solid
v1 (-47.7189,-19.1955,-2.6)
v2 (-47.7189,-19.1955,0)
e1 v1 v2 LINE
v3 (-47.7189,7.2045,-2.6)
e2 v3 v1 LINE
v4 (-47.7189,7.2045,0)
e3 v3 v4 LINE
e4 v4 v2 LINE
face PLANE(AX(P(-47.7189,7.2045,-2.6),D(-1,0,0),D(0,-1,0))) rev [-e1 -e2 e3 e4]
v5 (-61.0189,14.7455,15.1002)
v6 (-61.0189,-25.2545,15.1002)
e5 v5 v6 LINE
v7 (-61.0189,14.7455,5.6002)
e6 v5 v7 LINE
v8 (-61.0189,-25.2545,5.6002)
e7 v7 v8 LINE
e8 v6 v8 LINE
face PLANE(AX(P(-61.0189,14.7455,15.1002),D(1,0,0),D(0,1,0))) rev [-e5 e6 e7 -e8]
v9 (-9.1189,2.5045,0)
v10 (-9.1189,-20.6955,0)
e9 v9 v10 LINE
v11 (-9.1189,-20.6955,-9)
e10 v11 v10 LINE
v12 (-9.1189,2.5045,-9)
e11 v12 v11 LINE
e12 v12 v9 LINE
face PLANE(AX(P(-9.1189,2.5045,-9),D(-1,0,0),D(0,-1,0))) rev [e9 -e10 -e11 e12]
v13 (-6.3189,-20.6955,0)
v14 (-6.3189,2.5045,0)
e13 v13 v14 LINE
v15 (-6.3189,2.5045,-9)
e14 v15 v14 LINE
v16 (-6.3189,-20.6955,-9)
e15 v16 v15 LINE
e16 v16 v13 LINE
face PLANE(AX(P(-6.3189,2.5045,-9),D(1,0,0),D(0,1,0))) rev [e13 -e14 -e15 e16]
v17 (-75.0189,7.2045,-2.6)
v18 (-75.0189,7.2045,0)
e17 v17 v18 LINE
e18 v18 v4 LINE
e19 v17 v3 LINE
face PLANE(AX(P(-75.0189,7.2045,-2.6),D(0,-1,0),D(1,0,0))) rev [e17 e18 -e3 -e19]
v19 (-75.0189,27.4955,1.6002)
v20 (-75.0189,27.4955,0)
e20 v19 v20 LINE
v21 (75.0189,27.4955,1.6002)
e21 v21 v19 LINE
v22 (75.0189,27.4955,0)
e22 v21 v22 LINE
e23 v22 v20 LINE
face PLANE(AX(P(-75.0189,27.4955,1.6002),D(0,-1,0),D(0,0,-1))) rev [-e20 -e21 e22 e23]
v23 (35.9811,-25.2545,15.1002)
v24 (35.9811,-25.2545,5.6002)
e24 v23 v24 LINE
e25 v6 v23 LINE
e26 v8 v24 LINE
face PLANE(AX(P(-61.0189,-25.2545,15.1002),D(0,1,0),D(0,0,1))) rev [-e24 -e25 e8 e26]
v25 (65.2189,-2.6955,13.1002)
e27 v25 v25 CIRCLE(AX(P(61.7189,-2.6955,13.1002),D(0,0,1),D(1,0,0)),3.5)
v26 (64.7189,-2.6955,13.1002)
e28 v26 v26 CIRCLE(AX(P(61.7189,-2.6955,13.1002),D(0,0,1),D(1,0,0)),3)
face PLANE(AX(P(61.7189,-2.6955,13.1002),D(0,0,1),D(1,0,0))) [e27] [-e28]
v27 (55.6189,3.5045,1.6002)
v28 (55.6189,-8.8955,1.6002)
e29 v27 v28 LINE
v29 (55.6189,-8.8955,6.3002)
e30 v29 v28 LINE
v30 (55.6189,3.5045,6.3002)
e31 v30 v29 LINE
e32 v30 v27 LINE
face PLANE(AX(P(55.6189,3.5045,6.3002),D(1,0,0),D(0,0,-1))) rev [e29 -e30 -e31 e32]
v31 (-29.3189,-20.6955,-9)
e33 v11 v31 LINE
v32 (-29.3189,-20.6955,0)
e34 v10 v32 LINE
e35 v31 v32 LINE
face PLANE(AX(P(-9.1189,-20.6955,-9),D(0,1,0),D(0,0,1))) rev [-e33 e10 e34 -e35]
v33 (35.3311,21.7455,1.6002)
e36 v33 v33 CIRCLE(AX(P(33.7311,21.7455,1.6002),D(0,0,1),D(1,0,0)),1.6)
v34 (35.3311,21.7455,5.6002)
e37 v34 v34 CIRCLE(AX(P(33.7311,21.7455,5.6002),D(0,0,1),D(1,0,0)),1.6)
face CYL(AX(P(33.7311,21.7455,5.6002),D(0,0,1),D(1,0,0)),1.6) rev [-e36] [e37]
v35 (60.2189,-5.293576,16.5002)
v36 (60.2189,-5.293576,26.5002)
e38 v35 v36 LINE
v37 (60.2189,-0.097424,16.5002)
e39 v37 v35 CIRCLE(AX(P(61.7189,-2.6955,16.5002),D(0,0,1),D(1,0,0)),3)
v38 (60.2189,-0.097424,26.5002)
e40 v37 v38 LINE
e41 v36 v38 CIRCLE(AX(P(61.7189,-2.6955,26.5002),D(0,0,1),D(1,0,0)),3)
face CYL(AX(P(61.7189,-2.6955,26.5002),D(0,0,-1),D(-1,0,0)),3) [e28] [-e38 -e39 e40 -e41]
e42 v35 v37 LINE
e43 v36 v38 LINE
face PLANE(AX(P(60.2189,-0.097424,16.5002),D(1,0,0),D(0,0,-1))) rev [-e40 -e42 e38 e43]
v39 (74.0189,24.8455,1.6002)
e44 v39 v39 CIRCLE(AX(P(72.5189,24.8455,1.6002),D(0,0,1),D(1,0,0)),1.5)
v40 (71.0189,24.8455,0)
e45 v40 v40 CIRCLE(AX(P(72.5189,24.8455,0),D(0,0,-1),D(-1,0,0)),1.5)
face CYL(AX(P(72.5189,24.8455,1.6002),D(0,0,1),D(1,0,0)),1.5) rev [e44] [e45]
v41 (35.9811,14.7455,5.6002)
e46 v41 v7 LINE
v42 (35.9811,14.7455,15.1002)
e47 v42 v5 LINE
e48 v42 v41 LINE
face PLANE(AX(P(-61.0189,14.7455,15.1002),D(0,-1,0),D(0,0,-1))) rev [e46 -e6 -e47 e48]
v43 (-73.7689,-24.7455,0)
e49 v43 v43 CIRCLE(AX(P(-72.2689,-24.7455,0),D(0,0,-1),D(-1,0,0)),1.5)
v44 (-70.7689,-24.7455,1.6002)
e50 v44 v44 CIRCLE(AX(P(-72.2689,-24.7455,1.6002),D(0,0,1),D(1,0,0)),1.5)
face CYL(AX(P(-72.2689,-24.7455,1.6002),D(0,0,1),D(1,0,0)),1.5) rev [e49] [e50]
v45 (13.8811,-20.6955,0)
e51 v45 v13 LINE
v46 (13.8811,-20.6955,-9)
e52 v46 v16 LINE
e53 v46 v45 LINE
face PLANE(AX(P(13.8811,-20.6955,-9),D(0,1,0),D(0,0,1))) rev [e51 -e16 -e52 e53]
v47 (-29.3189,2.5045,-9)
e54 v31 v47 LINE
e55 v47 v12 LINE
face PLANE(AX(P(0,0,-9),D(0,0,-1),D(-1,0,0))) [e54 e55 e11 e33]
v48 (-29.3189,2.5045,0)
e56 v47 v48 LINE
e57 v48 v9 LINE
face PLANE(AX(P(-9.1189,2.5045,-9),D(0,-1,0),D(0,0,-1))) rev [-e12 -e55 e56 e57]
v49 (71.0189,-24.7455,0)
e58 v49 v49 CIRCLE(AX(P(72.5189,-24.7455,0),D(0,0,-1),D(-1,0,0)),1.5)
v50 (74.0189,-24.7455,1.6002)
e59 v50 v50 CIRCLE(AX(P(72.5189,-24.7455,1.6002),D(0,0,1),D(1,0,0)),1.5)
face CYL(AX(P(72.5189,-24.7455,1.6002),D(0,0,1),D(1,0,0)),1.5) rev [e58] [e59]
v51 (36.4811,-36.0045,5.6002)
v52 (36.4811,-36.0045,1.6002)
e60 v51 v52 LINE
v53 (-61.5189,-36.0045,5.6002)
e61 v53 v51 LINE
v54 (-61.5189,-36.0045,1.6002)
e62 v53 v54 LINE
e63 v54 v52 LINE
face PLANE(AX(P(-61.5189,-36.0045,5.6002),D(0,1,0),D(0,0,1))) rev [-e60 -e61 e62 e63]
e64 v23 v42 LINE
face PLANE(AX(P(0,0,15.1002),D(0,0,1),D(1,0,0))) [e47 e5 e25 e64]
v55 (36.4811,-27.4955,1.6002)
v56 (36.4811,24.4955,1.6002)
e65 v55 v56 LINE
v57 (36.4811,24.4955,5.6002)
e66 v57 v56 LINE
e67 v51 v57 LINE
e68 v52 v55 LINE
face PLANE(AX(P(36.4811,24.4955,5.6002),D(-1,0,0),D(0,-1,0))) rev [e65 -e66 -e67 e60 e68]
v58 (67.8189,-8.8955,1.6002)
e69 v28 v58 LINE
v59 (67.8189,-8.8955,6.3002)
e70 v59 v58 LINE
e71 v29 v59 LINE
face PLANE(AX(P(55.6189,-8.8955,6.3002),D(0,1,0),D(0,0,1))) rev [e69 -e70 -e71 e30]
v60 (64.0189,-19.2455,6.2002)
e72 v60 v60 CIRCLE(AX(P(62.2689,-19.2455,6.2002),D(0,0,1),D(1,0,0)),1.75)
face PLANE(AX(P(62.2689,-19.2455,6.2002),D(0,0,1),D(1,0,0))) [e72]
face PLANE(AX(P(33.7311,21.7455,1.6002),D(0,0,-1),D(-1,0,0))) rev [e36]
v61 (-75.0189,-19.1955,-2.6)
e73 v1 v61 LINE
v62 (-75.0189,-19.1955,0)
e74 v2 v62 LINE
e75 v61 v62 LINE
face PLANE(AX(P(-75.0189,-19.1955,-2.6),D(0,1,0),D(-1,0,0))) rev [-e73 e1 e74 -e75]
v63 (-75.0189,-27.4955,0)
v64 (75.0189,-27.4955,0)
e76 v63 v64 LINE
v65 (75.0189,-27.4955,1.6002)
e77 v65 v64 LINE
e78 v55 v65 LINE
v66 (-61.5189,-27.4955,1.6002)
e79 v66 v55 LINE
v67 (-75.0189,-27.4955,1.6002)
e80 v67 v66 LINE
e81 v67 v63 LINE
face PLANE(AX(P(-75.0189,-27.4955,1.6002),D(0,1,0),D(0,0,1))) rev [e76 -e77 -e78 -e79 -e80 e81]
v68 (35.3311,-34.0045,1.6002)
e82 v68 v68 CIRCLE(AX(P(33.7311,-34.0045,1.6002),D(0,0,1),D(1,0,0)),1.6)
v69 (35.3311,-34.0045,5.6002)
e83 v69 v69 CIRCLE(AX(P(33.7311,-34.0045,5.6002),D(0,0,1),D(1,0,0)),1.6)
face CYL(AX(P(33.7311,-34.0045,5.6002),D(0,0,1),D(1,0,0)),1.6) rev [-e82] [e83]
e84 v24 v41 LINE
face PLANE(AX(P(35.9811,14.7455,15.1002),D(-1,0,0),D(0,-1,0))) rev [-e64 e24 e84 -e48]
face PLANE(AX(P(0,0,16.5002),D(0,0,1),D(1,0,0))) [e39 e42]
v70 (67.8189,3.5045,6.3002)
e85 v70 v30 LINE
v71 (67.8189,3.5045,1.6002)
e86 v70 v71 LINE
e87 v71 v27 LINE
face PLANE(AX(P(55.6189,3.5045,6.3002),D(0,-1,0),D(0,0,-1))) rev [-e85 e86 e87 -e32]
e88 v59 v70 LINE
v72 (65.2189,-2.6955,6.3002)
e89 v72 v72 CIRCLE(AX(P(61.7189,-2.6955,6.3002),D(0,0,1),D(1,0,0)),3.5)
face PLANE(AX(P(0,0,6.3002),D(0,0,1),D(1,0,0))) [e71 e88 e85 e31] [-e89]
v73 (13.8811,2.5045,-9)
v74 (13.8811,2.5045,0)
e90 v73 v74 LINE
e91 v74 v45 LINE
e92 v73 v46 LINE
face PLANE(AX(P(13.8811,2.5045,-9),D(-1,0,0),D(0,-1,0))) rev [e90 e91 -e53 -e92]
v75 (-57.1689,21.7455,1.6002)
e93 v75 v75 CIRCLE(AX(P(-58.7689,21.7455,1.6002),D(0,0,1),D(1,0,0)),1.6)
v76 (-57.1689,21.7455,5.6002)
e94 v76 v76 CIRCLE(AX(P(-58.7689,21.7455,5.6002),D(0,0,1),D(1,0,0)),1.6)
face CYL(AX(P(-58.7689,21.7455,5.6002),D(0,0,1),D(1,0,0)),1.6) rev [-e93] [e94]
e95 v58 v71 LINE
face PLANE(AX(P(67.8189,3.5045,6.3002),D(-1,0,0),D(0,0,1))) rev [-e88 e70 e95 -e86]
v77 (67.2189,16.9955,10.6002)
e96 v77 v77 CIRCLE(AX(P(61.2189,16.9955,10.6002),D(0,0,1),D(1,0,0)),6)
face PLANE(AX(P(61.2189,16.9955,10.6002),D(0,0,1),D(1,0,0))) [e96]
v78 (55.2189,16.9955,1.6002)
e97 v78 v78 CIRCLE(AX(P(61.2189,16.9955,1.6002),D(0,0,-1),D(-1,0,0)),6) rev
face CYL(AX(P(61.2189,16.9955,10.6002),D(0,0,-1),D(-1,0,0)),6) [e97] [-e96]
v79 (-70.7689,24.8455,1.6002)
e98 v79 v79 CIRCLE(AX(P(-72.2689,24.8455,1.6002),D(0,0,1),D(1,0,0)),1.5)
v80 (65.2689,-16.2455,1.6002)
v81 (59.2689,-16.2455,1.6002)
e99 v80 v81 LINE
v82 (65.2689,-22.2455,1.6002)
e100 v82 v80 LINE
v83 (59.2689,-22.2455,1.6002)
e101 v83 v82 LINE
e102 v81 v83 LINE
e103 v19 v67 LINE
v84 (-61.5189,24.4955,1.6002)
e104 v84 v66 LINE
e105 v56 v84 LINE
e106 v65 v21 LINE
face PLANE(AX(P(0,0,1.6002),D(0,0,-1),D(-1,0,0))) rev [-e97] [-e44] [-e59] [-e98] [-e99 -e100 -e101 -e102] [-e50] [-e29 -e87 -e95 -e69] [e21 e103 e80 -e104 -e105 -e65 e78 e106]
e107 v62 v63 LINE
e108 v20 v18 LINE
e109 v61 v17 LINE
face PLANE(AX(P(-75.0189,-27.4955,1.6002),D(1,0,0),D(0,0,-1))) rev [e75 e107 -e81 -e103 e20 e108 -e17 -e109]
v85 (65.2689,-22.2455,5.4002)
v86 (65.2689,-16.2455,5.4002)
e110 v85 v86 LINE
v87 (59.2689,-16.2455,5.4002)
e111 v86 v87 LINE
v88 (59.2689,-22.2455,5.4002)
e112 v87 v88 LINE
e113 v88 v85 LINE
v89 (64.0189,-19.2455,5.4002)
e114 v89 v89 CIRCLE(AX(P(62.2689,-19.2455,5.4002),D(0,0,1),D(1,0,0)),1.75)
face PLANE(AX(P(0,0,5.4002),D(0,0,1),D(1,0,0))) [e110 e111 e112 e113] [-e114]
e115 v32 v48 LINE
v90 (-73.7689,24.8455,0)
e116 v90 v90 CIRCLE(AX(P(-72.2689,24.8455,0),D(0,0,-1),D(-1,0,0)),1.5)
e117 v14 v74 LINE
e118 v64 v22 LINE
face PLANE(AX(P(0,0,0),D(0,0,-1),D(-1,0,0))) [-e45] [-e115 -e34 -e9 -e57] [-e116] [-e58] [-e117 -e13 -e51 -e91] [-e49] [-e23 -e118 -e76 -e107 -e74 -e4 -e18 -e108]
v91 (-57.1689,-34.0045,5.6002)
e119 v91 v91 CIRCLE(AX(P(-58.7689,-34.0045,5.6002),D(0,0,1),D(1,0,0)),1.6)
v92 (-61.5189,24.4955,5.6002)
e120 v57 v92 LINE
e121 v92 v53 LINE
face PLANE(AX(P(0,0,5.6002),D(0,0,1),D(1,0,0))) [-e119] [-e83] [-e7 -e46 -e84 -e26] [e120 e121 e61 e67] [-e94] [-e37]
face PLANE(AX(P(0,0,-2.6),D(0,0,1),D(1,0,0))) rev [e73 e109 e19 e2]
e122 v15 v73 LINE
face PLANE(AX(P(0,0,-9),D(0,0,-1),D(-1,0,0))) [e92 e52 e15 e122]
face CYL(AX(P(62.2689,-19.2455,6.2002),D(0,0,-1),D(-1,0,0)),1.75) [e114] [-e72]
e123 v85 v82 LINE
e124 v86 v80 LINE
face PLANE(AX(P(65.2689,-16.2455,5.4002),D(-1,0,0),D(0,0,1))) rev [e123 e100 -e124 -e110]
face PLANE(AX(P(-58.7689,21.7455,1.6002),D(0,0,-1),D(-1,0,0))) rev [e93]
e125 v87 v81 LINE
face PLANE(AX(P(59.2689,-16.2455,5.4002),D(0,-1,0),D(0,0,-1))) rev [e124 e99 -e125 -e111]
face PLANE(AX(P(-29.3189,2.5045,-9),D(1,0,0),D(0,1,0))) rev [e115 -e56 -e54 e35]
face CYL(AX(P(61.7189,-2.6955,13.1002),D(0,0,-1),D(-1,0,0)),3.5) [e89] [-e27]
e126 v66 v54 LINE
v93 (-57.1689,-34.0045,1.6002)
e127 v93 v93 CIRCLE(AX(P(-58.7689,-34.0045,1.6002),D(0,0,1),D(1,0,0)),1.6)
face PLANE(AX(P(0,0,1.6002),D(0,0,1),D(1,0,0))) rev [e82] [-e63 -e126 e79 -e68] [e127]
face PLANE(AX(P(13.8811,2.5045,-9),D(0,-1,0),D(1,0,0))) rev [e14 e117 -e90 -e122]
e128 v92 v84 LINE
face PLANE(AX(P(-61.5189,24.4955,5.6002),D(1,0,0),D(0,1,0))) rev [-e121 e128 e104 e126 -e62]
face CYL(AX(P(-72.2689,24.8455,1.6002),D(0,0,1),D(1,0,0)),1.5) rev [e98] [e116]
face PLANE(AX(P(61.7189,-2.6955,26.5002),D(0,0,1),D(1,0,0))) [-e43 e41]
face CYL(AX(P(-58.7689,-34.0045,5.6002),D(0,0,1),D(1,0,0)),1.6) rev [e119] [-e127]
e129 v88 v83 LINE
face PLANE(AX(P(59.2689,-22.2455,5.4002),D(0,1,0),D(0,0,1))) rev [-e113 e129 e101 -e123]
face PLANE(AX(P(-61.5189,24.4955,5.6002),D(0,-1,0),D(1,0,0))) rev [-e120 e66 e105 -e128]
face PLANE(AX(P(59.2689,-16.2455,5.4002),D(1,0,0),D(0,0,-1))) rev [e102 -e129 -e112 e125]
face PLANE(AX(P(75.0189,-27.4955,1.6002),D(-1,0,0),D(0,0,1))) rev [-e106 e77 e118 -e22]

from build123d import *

# Parameters (mm, degrees)
SKETCH1_W                          = 150.0378
SKETCH1_H                          = 54.991
BOSS_EXTRUDE1_DEPTH                = 1.6002
SKETCH2_W                          = 98
SKETCH2_H                          = 60.5
BOSS_EXTRUDE2_DEPTH                = 4
SKETCH3_W                          = 97
SKETCH3_H                          = 40
BOSS_EXTRUDE3_DEPTH                = 9.5
SKETCH4_R                          = 6
BOSS_EXTRUDE4_DEPTH                = 9
SKETCH5_W                          = 12.2
SKETCH5_H                          = 12.4
BOSS_EXTRUDE5_DEPTH                = 4.7
SKETCH6_R                          = 3.5
BOSS_EXTRUDE6_DEPTH                = 6.8
SKETCH7_R                          = 3
BOSS_EXTRUDE7_DEPTH                = 13.4
SKETCH8_W                          = 1.5
SKETCH8_H                          = 5.196152422
CUT_EXTRUDE1_DEPTH                 = 10
SKETCH9_W                          = 6
SKETCH9_H                          = 6
BOSS_EXTRUDE8_DEPTH                = 3.8
SKETCH10_R                         = 1.75
BOSS_EXTRUDE9_DEPTH                = 0.8
SKETCH11_W                         = 27.3
SKETCH11_H                         = 26.4
BOSS_EXTRUDE10_DEPTH               = 2.6
SKETCH12_W                         = 20.2
SKETCH12_H                         = 23.2
BOSS_EXTRUDE11_DEPTH               = 9
F_3_0_3_DIAMETER_HOLE1_D           = 3
F_3_2_START                        = 1.6002
F_3_2_3_2_DIAMETER_HOLE1_OUTLINE_R = 1.6
F_3_2_3_2_DIAMETER_HOLE1_DEPTH     = 4


# Read off the part's stored shape, not the designer's step: Ø3.2 (3.2) Diameter Hole1
with BuildPart() as part:
    # Sketch1 → Boss-Extrude1 (new body)
    with BuildSketch(Plane.XY):
        Rectangle(SKETCH1_W, SKETCH1_H)
    extrude(amount=BOSS_EXTRUDE1_DEPTH)

    # Sketch2 → Boss-Extrude2 (add)
    with BuildSketch(Plane.XY.offset(1.6002)):
        with Locations((-12.5189, -5.7545)):
            Rectangle(SKETCH2_W, SKETCH2_H)
    extrude(amount=BOSS_EXTRUDE2_DEPTH)

    # Sketch3 → Boss-Extrude3 (add)
    with BuildSketch(Plane.XY.offset(5.6002)):
        with Locations((-12.5189, -5.2545)):
            Rectangle(SKETCH3_W, SKETCH3_H)
    extrude(amount=BOSS_EXTRUDE3_DEPTH)

    # Sketch4 → Boss-Extrude4 (add)
    with BuildSketch(Plane.XY.offset(1.6002)):
        with Locations(Location((61.2189, 16.9955, 0), (0, 0, 180))):
            Circle(SKETCH4_R)
    extrude(amount=BOSS_EXTRUDE4_DEPTH)

    # Sketch5 → Boss-Extrude5 (add)
    with BuildSketch(Plane.XY.offset(1.6002)):
        with Locations((61.7189, -2.6955)):
            Rectangle(SKETCH5_W, SKETCH5_H)
    extrude(amount=BOSS_EXTRUDE5_DEPTH)

    # Sketch6 → Boss-Extrude6 (add)
    with BuildSketch(Plane.XY.offset(6.3002)):
        with Locations((61.7189, -2.6955)):
            Circle(SKETCH6_R)
    extrude(amount=BOSS_EXTRUDE6_DEPTH)

    # Sketch7 → Boss-Extrude7 (add)
    with BuildSketch(Plane.XY.offset(13.1002)):
        with Locations((61.7189, -2.6955)):
            Circle(SKETCH7_R)
    extrude(amount=BOSS_EXTRUDE7_DEPTH)

    # Sketch8 → Cut-Extrude1 (cut)
    with BuildSketch(Plane.XY.offset(26.5002)):
        with Locations((59.4689, -2.6955)):
            Rectangle(SKETCH8_W, SKETCH8_H)
    extrude(amount=-CUT_EXTRUDE1_DEPTH, mode=Mode.SUBTRACT)

    # Sketch9 → Boss-Extrude8 (add)
    with BuildSketch(Plane.XY.offset(1.6002)):
        with Locations((62.2689, -19.2455)):
            Rectangle(SKETCH9_W, SKETCH9_H)
    extrude(amount=BOSS_EXTRUDE8_DEPTH)

    # Sketch10 → Boss-Extrude9 (add)
    with BuildSketch(Plane.XY.offset(5.4002)):
        with Locations((62.2689, -19.2455)):
            Circle(SKETCH10_R)
    extrude(amount=BOSS_EXTRUDE9_DEPTH)

    # Sketch11 → Boss-Extrude10 (add)
    with BuildSketch(Plane(origin=(0, 0, 0), x_dir=(-1, 0, 0), z_dir=(0, 0, -1))):
        with Locations((61.3689, -5.9955)):
            Rectangle(SKETCH11_W, SKETCH11_H)
    extrude(amount=BOSS_EXTRUDE10_DEPTH)

    # Sketch12 → Boss-Extrude11 (add)
    with BuildSketch(Plane(origin=(0, 0, 0), x_dir=(-1, 0, 0), z_dir=(0, 0, -1))):
        with Locations((19.2189, -9.0955)):
            Rectangle(SKETCH12_W, SKETCH12_H)
        with Locations((-3.7811, -9.0955)):
            Rectangle(SKETCH12_W, SKETCH12_H)
    extrude(amount=BOSS_EXTRUDE11_DEPTH)

    # Ø3.0 (3) Diameter Hole1 (through all)
    with Locations(Plane.XY.offset(1.6002)):
        with Locations((-72.2689, 24.8455), (-72.2689, -24.7455), (72.5189, -24.7455), (72.5189, 24.8455)):
            Hole(F_3_0_3_DIAMETER_HOLE1_D / 2)

    # Ø3.2 (3.2) Diameter Hole1 outline → Ø3.2 (3.2) Diameter Hole1 (cut)
    with BuildSketch(Plane.XY.offset(F_3_2_START)):
        with Locations((-58.7689, -34.0045)):
            Circle(F_3_2_3_2_DIAMETER_HOLE1_OUTLINE_R)
        with Locations((33.7311, -34.0045)):
            Circle(F_3_2_3_2_DIAMETER_HOLE1_OUTLINE_R)
        with Locations((33.7311, 21.7455)):
            Circle(F_3_2_3_2_DIAMETER_HOLE1_OUTLINE_R)
        with Locations((-58.7689, 21.7455)):
            Circle(F_3_2_3_2_DIAMETER_HOLE1_OUTLINE_R)
    extrude(amount=F_3_2_3_2_DIAMETER_HOLE1_DEPTH, mode=Mode.SUBTRACT)


solid = part.part
